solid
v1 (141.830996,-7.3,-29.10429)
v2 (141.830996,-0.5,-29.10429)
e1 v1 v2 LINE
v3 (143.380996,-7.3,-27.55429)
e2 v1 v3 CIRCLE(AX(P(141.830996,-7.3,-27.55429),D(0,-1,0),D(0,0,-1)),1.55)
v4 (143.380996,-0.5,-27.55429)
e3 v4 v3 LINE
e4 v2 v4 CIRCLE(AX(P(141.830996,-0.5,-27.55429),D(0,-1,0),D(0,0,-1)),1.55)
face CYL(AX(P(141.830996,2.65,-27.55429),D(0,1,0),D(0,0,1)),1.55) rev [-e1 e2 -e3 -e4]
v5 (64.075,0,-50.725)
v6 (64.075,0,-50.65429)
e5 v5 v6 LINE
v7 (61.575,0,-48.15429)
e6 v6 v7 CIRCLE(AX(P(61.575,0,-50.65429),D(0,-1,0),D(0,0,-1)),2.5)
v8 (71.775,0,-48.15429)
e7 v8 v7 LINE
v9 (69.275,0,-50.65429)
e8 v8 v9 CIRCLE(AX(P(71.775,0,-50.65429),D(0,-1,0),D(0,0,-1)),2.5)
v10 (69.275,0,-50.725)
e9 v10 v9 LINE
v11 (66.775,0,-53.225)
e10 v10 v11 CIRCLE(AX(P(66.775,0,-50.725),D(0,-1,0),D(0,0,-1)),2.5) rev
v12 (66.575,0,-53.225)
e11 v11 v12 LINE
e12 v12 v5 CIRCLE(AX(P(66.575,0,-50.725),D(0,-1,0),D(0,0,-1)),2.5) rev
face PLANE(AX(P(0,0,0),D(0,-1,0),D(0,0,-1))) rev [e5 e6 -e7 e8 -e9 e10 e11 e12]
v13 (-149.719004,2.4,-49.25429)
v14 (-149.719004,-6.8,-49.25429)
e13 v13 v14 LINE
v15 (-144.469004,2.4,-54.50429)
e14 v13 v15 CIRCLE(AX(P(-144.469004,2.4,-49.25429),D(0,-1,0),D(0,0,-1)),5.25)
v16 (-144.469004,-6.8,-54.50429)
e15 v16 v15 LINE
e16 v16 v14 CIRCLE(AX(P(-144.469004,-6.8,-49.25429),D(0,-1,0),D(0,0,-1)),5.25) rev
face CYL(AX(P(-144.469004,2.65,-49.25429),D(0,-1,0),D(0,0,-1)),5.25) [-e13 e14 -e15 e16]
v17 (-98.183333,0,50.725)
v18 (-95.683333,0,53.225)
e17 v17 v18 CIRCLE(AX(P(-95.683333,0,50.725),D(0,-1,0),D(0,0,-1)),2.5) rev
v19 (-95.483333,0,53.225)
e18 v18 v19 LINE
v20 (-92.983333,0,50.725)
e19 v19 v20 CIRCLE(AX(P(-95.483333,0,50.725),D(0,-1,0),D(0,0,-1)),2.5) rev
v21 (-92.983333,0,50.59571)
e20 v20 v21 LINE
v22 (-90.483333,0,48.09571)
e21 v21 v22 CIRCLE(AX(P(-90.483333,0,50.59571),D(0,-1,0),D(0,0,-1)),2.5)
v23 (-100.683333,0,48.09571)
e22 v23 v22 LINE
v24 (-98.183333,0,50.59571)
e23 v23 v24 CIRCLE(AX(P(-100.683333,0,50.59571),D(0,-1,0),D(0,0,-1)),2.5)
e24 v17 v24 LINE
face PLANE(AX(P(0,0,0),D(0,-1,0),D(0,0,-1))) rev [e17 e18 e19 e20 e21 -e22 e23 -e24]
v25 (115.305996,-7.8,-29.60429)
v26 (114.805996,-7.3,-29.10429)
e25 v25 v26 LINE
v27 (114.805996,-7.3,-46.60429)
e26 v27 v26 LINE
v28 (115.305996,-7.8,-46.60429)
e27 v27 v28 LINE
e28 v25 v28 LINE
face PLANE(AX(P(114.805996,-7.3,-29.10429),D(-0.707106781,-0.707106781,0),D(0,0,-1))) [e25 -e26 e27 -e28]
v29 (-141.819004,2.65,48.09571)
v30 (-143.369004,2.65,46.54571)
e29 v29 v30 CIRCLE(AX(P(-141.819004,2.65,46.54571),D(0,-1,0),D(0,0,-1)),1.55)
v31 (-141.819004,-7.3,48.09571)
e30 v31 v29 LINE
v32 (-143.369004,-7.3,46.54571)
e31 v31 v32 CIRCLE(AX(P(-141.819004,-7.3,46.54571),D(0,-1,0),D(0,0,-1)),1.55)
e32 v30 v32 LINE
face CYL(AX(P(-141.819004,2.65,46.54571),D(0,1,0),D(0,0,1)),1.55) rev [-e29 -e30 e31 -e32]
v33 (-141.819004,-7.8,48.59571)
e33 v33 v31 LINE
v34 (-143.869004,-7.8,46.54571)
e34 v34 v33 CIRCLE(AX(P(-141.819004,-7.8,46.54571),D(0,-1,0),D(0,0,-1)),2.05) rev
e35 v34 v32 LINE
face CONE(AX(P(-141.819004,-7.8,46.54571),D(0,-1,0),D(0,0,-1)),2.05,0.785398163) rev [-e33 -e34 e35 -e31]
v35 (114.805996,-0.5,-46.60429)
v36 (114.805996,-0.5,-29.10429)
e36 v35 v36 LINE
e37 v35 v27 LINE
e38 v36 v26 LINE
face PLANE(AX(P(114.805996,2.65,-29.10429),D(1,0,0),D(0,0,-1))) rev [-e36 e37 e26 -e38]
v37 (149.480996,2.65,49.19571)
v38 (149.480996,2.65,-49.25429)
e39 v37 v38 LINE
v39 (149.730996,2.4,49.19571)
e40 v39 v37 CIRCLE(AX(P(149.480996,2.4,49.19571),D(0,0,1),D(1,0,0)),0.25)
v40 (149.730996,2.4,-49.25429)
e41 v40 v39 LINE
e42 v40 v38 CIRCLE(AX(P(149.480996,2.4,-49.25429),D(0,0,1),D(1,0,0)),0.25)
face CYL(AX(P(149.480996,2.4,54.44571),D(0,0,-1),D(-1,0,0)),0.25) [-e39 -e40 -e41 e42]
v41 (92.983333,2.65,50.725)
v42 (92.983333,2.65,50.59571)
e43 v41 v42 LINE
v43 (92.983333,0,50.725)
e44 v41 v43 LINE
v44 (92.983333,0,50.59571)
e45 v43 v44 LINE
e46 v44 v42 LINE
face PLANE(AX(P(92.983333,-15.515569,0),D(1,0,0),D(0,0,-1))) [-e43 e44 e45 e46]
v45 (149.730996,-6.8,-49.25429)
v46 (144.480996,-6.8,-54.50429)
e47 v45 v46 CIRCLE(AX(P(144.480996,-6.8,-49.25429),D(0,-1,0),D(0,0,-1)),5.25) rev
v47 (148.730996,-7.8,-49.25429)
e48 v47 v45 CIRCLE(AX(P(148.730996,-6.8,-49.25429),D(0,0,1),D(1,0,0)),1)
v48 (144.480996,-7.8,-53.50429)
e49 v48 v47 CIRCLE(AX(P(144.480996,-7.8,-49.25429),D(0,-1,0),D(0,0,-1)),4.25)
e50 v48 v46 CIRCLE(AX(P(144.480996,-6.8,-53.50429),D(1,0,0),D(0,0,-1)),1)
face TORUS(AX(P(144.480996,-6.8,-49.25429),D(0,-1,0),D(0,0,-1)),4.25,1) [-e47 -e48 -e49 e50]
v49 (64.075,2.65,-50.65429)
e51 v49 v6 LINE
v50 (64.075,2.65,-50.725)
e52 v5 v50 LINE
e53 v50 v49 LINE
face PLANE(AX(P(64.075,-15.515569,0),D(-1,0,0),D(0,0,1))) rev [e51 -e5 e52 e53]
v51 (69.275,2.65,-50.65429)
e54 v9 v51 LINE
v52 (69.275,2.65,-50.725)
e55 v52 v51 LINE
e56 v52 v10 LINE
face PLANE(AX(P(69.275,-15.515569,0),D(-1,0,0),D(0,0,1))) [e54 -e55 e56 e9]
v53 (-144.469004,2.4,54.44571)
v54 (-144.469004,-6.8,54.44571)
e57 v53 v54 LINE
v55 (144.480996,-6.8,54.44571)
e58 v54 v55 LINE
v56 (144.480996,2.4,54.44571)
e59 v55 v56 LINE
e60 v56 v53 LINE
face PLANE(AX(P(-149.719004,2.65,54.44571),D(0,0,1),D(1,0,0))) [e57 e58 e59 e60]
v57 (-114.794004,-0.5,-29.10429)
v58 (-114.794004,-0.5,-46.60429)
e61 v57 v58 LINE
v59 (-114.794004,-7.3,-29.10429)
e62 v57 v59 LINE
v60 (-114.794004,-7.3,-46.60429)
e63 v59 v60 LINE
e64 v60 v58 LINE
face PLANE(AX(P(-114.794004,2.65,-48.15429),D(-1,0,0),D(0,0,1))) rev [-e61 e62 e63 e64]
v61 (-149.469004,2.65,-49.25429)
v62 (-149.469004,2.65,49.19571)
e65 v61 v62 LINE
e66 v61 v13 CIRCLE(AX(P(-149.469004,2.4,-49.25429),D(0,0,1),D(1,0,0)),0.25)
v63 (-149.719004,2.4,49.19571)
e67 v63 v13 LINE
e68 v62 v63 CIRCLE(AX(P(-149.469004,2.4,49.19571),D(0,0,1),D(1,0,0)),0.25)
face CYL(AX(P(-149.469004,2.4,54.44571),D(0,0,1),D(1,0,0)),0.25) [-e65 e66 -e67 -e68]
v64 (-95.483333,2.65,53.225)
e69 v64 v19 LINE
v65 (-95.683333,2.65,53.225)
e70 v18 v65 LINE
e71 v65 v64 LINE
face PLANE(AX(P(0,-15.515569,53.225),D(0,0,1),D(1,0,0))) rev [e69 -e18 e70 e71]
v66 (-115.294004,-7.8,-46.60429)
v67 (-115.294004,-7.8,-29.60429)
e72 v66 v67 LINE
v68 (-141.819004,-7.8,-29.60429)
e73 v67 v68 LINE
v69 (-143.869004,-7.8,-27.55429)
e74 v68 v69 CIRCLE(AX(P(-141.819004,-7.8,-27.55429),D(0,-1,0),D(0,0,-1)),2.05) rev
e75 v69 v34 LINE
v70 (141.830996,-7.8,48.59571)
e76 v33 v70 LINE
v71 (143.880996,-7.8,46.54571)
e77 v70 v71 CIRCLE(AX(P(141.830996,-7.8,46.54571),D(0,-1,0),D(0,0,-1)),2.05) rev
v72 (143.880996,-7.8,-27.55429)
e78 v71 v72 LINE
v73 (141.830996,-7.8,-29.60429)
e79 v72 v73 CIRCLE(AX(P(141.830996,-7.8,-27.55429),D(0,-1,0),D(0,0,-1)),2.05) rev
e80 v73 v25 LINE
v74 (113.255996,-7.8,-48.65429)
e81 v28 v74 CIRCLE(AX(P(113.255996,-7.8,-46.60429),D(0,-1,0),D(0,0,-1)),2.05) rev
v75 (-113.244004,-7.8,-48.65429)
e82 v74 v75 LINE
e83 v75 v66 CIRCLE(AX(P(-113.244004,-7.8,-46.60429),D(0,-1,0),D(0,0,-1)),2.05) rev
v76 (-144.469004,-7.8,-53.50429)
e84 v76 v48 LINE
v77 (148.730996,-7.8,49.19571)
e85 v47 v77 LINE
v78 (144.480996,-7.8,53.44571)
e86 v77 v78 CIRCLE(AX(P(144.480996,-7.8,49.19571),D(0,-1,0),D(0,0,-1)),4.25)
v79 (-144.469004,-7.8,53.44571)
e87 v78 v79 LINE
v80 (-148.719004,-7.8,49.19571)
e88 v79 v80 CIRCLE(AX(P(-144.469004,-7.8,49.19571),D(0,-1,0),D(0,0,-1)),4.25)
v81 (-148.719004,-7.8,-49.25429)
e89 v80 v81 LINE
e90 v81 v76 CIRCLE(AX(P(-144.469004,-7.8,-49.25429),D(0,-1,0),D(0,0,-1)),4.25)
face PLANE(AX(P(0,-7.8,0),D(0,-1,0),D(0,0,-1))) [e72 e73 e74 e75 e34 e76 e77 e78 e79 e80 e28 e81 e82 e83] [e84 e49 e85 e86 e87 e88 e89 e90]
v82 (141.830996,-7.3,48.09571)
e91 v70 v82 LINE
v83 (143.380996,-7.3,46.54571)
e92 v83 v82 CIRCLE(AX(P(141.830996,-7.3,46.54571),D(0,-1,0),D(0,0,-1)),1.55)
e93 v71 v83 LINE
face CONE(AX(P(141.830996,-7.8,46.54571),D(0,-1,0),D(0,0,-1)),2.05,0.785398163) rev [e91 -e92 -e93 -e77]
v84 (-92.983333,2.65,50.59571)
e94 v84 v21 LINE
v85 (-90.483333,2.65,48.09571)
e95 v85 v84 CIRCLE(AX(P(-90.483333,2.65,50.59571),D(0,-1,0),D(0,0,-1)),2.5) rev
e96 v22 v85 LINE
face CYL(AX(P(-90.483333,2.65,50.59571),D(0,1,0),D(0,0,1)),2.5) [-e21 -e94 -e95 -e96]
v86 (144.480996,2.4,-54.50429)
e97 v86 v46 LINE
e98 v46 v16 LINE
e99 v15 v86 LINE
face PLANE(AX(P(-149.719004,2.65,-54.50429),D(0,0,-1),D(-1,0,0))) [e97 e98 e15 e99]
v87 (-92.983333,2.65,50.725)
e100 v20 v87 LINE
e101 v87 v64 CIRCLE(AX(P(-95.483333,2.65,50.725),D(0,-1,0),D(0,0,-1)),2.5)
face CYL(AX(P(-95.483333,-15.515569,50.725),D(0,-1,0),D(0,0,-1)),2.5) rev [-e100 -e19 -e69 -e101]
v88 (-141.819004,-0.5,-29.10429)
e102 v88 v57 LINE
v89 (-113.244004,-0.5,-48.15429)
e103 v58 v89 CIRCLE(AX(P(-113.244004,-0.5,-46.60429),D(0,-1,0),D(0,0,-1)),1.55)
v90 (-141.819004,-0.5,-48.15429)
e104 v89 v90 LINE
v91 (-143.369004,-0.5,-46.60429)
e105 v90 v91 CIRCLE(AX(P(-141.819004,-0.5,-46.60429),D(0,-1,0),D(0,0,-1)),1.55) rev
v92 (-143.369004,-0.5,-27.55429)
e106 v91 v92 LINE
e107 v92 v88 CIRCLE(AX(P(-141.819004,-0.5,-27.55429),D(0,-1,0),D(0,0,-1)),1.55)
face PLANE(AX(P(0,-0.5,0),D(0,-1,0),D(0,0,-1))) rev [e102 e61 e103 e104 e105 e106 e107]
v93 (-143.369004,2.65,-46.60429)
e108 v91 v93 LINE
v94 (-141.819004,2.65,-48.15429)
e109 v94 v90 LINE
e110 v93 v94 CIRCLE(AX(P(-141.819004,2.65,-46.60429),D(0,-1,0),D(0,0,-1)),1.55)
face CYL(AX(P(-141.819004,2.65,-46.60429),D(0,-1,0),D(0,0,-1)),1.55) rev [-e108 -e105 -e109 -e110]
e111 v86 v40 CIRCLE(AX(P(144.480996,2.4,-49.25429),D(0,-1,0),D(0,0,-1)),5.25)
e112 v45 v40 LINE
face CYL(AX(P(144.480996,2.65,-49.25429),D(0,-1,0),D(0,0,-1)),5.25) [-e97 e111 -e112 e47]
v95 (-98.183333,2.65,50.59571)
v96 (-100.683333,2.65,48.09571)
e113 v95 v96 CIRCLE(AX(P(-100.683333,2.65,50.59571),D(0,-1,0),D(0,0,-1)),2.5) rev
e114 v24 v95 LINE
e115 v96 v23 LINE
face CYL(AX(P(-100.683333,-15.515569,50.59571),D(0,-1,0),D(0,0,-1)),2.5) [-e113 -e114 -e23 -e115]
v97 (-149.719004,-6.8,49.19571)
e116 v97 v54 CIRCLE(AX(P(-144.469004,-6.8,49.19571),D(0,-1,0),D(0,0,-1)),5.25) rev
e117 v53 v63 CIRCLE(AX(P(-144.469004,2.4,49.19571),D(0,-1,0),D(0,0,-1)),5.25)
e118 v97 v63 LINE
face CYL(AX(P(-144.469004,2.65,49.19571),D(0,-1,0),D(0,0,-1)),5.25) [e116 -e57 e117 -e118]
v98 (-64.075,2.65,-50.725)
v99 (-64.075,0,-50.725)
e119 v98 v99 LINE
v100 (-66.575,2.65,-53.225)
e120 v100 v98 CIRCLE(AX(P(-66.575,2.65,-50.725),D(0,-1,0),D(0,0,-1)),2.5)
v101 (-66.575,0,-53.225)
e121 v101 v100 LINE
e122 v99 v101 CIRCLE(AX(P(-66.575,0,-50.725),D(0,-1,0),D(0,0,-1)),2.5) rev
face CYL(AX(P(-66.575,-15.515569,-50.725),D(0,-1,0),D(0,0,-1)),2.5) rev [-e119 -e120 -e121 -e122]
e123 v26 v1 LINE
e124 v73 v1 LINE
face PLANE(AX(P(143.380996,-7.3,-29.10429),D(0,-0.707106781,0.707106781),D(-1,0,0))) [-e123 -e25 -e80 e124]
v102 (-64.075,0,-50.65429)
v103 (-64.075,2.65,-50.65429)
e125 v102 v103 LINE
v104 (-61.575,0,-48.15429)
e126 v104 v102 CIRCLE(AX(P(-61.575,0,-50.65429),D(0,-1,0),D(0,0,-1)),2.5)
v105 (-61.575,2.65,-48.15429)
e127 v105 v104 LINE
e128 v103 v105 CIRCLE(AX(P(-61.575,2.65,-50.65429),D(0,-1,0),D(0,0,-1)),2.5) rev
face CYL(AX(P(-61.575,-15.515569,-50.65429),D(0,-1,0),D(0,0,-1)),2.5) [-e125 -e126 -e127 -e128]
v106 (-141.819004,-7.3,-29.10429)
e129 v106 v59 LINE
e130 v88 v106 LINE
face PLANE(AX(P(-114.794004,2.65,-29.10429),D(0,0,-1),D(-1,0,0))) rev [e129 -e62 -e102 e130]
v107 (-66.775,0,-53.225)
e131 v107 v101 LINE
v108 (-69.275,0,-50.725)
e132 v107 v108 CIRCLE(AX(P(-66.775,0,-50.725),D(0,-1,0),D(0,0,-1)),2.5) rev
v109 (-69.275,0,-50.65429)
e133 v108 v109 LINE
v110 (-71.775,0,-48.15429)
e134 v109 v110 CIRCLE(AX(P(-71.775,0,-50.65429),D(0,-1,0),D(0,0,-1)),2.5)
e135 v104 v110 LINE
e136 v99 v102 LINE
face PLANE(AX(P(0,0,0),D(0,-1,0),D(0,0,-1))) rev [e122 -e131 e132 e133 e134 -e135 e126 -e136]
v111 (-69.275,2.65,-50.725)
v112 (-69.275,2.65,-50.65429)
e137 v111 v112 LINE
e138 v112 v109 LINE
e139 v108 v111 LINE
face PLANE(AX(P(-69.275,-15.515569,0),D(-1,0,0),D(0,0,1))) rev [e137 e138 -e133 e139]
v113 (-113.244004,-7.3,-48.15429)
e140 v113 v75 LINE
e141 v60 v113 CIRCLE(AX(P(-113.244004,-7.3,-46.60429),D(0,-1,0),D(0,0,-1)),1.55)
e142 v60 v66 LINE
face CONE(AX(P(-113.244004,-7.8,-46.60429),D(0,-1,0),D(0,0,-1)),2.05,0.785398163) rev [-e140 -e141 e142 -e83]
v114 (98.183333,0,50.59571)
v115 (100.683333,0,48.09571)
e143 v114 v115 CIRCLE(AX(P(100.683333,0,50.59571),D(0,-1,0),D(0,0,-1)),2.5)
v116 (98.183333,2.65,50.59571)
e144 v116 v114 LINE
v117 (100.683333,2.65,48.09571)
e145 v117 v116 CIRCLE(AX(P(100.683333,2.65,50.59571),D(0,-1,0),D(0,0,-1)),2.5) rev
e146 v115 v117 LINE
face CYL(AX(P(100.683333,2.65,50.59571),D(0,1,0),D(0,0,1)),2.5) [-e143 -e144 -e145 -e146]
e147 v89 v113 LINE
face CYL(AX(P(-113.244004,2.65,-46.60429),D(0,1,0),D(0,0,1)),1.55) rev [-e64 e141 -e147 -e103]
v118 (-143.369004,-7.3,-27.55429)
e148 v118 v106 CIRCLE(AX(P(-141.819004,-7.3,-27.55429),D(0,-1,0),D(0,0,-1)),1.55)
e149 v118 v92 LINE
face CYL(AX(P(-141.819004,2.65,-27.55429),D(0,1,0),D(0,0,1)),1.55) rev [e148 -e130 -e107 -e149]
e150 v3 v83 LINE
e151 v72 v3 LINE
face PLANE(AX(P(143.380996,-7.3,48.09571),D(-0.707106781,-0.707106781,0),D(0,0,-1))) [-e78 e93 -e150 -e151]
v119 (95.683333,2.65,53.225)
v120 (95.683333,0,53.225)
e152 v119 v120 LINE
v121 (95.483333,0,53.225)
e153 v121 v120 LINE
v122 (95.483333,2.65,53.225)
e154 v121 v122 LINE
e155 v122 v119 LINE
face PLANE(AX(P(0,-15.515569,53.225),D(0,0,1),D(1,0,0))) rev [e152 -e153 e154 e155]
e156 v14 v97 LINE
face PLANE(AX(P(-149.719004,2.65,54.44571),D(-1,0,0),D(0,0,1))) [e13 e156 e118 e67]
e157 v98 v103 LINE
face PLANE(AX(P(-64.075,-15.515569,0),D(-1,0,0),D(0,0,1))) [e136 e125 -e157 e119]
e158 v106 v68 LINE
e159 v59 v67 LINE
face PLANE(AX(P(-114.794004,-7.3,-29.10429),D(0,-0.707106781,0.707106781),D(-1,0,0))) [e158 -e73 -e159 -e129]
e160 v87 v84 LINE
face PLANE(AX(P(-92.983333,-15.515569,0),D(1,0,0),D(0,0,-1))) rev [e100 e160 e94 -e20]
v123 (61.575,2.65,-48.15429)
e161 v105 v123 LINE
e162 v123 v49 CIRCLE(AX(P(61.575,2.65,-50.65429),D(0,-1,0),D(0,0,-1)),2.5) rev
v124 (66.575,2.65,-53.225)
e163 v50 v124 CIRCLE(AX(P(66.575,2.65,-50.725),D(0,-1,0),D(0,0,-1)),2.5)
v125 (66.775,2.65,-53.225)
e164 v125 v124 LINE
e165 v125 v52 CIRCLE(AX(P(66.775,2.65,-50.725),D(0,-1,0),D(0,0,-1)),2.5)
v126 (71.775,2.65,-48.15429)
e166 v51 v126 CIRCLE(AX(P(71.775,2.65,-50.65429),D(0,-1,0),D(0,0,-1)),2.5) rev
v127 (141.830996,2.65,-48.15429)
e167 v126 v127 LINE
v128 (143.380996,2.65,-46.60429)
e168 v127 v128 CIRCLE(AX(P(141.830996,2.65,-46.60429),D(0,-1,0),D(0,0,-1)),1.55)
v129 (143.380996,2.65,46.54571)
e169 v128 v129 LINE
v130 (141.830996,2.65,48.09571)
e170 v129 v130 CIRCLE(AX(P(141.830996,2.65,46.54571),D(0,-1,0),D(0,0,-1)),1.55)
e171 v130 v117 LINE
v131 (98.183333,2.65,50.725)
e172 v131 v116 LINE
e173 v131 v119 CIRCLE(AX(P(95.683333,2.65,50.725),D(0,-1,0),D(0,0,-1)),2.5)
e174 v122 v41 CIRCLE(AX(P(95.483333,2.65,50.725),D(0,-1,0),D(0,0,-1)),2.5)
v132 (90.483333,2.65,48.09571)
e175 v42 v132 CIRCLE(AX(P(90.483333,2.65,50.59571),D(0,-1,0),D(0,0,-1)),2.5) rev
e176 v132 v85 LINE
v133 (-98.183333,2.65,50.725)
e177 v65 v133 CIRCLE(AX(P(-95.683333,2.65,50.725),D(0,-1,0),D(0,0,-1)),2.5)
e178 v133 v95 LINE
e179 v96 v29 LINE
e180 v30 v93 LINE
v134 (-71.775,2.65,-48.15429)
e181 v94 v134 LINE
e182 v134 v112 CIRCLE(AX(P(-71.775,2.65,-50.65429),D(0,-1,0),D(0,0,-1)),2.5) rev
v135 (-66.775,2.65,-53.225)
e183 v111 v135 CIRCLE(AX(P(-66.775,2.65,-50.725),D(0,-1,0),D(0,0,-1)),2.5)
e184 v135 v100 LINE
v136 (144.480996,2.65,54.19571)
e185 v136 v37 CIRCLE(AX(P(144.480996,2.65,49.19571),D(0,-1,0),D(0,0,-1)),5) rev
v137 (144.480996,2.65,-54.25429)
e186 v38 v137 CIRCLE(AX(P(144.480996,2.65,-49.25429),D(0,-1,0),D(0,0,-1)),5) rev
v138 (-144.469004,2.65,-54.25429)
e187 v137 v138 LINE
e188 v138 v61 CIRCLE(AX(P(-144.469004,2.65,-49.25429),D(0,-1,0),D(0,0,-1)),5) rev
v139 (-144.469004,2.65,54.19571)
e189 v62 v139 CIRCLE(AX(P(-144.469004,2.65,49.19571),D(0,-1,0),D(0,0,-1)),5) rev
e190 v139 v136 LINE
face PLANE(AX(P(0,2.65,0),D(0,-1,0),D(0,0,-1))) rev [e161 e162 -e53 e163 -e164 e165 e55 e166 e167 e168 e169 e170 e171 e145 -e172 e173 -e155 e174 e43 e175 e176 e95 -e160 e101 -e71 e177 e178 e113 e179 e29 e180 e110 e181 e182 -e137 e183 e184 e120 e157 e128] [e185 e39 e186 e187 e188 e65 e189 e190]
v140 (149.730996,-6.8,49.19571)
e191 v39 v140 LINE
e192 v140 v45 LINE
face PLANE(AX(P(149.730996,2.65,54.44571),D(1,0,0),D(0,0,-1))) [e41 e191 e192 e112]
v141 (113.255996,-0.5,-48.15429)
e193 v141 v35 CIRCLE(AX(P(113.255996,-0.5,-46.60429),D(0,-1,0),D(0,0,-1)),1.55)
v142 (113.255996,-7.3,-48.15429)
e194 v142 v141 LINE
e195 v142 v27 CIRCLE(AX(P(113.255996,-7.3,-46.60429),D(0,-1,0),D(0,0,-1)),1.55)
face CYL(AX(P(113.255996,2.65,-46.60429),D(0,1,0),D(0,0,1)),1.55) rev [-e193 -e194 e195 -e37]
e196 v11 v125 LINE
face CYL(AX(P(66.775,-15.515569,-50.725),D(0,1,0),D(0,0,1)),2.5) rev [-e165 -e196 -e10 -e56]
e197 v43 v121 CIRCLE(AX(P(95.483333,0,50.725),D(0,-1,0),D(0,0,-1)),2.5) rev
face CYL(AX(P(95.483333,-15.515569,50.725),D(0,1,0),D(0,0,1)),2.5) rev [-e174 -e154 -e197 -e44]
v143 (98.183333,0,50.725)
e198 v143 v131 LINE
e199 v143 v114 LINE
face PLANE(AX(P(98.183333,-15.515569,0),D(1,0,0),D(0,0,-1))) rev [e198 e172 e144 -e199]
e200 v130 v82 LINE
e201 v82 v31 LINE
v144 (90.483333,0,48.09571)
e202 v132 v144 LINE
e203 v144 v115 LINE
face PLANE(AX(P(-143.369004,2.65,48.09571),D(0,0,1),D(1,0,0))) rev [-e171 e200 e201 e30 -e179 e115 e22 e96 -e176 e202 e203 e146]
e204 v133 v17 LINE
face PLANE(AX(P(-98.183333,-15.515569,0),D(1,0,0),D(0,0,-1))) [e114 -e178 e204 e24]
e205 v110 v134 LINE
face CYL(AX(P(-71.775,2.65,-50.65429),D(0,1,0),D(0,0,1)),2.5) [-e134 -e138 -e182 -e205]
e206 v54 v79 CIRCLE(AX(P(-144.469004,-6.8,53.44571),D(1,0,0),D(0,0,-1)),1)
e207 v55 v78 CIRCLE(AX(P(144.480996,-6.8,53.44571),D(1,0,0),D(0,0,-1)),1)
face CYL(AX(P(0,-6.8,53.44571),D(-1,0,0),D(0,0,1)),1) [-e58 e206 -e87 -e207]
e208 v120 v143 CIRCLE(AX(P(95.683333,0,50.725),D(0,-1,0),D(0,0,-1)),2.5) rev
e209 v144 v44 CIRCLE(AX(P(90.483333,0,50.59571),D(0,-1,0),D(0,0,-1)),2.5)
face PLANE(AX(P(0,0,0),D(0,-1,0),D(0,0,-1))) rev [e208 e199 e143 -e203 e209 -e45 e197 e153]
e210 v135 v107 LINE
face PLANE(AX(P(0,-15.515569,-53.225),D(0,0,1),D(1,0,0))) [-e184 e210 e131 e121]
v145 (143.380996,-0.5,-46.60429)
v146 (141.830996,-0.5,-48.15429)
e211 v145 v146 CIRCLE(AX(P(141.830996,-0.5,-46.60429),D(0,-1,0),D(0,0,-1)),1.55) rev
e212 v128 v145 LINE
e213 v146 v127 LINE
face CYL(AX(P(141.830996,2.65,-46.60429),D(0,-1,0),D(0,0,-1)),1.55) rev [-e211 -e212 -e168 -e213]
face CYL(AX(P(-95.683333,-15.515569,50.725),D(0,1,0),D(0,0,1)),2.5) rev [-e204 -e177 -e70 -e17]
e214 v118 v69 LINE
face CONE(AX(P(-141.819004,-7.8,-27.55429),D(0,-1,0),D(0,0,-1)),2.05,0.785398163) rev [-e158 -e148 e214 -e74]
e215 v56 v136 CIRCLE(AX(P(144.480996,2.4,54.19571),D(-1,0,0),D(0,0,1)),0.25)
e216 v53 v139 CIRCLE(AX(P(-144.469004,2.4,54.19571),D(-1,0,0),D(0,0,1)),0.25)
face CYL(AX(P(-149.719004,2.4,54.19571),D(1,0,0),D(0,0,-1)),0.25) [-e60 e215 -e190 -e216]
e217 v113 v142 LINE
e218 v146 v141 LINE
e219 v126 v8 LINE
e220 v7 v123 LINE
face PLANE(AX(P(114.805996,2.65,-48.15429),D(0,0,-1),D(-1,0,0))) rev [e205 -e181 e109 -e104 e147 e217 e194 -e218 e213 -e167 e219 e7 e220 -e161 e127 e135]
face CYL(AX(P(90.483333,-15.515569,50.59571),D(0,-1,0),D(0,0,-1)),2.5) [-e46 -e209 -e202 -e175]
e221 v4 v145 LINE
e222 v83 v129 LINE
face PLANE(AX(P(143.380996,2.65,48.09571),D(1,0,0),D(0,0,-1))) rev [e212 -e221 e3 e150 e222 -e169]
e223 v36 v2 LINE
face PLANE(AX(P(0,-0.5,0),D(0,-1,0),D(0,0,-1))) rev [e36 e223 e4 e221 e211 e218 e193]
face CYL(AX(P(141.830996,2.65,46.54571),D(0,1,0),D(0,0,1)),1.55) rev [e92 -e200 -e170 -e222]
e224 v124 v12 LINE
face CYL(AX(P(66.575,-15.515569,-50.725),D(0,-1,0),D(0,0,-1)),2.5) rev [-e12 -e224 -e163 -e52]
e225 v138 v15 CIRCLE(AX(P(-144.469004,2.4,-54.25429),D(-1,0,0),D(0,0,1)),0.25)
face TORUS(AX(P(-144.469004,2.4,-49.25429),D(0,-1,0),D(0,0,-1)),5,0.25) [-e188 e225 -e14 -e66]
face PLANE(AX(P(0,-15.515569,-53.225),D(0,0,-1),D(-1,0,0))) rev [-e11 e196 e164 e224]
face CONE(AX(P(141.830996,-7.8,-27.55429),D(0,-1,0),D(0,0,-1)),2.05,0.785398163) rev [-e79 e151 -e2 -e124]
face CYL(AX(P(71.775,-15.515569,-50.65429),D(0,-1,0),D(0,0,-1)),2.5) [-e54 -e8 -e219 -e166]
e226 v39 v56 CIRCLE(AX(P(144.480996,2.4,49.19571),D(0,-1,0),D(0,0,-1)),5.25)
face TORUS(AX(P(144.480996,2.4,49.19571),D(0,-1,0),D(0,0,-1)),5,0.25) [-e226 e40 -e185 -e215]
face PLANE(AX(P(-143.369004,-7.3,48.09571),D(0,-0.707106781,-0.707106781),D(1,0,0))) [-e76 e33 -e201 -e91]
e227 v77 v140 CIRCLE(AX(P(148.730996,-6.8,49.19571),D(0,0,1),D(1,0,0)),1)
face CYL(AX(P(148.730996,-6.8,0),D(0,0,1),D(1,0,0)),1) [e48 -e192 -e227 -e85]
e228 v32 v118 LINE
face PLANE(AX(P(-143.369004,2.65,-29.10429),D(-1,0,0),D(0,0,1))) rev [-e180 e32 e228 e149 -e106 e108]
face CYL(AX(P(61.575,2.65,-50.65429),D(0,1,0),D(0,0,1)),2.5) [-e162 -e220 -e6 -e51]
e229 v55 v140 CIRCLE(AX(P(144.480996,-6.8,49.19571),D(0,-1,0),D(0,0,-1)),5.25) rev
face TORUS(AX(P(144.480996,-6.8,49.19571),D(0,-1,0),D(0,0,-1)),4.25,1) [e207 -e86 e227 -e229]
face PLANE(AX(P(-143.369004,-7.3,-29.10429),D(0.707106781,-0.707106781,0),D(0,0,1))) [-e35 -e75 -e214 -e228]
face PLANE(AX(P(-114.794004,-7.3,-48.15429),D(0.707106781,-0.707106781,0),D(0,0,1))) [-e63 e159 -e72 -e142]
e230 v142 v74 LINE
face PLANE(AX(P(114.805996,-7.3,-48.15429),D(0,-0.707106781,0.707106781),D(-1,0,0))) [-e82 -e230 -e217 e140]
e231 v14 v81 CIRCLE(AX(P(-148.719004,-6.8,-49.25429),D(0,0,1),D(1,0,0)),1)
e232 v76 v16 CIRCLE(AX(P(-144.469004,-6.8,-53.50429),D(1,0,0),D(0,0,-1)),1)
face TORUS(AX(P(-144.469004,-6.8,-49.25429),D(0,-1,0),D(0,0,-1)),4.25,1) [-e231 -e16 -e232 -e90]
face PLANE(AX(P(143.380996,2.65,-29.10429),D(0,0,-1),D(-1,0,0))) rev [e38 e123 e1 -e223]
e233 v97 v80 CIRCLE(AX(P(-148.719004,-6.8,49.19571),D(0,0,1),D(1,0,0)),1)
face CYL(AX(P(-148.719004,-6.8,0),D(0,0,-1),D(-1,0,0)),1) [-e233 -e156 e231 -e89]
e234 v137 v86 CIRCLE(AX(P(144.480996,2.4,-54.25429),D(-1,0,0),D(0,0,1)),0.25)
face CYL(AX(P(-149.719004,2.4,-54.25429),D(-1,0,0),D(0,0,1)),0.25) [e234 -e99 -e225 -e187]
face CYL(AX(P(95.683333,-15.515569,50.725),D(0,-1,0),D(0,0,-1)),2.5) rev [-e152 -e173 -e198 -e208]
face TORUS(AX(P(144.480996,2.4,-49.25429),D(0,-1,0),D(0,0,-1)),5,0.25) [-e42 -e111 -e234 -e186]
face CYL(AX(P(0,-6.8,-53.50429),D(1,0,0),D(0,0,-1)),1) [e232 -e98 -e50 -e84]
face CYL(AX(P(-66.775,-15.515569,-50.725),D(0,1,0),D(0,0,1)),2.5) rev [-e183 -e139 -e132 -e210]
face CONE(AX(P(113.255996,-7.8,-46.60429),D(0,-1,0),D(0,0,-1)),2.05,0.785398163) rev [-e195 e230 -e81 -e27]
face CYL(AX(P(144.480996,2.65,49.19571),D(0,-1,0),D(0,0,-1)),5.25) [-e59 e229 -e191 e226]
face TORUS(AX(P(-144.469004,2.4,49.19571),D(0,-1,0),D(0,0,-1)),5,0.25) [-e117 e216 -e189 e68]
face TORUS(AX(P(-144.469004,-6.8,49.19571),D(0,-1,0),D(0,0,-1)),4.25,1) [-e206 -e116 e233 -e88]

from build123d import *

# Parameters (mm, degrees)
BOSS_EXTRUDE1_DEPTH      = 7.8
BOSS_EXTRUDE1_DEPTH_BACK = 2.65
SKETCH1_W                = 299.45
SKETCH1_H                = 108.950000082
CUT_EXTRUDE1_START       = 2.65
SKETCH3_W                = 28.574999543
SKETCH3_H                = 19.050000082
SKETCH3_W_2              = 28.575000457
CUT_EXTRUDE1_DEPTH       = 3.15
CUT_EXTRUDE2_START       = -98.183332877
CUT_EXTRUDE2_OUTLINE_W   = 2.65
CUT_EXTRUDE2_OUTLINE_H   = 5.129290046
CUT_EXTRUDE2_DEPTH       = 5.2
CUT_EXTRUDE2_START_2     = 92.983332877
CUT_EXTRUDE2_2_OUTLINE_W = 2.65
CUT_EXTRUDE2_2_OUTLINE_H = 5.129290046
CUT_EXTRUDE2_2_DEPTH     = 5.2
CUT_EXTRUDE2_START_3     = -69.275
CUT_EXTRUDE2_3_OUTLINE_W = 2.65
CUT_EXTRUDE2_3_OUTLINE_H = 5.070709954
CUT_EXTRUDE2_3_DEPTH     = 5.2
CUT_EXTRUDE2_START_4     = 64.075
CUT_EXTRUDE2_4_OUTLINE_W = 2.65
CUT_EXTRUDE2_4_OUTLINE_H = 5.070709954
CUT_EXTRUDE2_4_DEPTH     = 5.2
FILLET1_R                = 5.25
FILLET2_R                = 1.55
FILLET3_R                = 0.25
CHAMFER1_SIZE            = 0.5
FILLET4_R                = 1
FILLET7_R                = 2.5


# Read off the part's stored shape, not the designer's step: Cut-Extrude2
with BuildPart() as part:
    # Sketch1 → Boss-Extrude1 (new, two sides: drawn at the far end of the back side and taken through both)
    with BuildSketch(Plane.XZ.offset(-BOSS_EXTRUDE1_DEPTH_BACK)):
        with Locations((0.005996207, -0.029290046)):
            Rectangle(SKETCH1_W, SKETCH1_H)
        Polygon((-143.369003793, 48.095709995), (143.380996207, 48.095709995), (143.380996207, -29.104290005), (114.80599575, -29.104290005), (114.80599575, -48.154290087), (-114.79400425, -48.154290087), (-114.79400425, -29.104290005), (-143.369003793, -29.104290005), align=None, mode=Mode.SUBTRACT)
    extrude(amount=BOSS_EXTRUDE1_DEPTH + BOSS_EXTRUDE1_DEPTH_BACK)

    # Sketch3 → Cut-Extrude1 (cut)
    with BuildSketch(Plane(origin=(0, 0, 0), x_dir=(1, 0, 0), z_dir=(0, 1, 0)).offset(CUT_EXTRUDE1_START)):
        with Locations((-129.081504021, 38.629290046)):
            Rectangle(SKETCH3_W, SKETCH3_H)
        with Locations((129.093495979, 38.629290046)):
            Rectangle(SKETCH3_W_2, SKETCH3_H)
    extrude(amount=-CUT_EXTRUDE1_DEPTH, mode=Mode.SUBTRACT)

    # Cut-Extrude2 outline → Cut-Extrude2 (cut)
    with BuildSketch(Plane.YZ.offset(CUT_EXTRUDE2_START)):
        with Locations((1.325, 50.660355018)):
            Rectangle(CUT_EXTRUDE2_OUTLINE_W, CUT_EXTRUDE2_OUTLINE_H)
    extrude(amount=CUT_EXTRUDE2_DEPTH, mode=Mode.SUBTRACT)

    # Cut-Extrude2 2 outline → Cut-Extrude2 2 (cut)
    with BuildSketch(Plane.YZ.offset(CUT_EXTRUDE2_START_2)):
        with Locations((1.325, 50.660355018)):
            Rectangle(CUT_EXTRUDE2_2_OUTLINE_W, CUT_EXTRUDE2_2_OUTLINE_H)
    extrude(amount=CUT_EXTRUDE2_2_DEPTH, mode=Mode.SUBTRACT)

    # Cut-Extrude2 3 outline → Cut-Extrude2 3 (cut)
    with BuildSketch(Plane.YZ.offset(CUT_EXTRUDE2_START_3)):
        with Locations((1.325, -50.689645064)):
            Rectangle(CUT_EXTRUDE2_3_OUTLINE_W, CUT_EXTRUDE2_3_OUTLINE_H)
    extrude(amount=CUT_EXTRUDE2_3_DEPTH, mode=Mode.SUBTRACT)

    # Cut-Extrude2 4 outline → Cut-Extrude2 4 (cut)
    with BuildSketch(Plane.YZ.offset(CUT_EXTRUDE2_START_4)):
        with Locations((1.325, -50.689645064)):
            Rectangle(CUT_EXTRUDE2_4_OUTLINE_W, CUT_EXTRUDE2_4_OUTLINE_H)
    extrude(amount=CUT_EXTRUDE2_4_DEPTH, mode=Mode.SUBTRACT)

    # Fillet1
    fillet1_edges = [part.edges().sort_by_distance(p)[0] for p in [
        (-149.719003793, -2.575, 54.445709995),
        (149.730996207, -2.575, 54.445709995),
        (149.730996207, -2.575, -54.504290087),
        (-149.719003793, -2.575, -54.504290087),
    ]]
    fillet(fillet1_edges, radius=FILLET1_R)

    # Fillet2
    fillet2_edges = [part.edges().sort_by_distance(p)[0] for p in [
        (-143.369003793, -2.575, 48.095709995),
        (143.380996207, -2.575, 48.095709995),
        (-143.369003793, -4.15, -29.104290005),
        (-114.79400425, -4.15, -48.154290087),
        (114.80599575, -4.15, -48.154290087),
        (143.380996207, -4.15, -29.104290005),
        (-143.369003793, 1.075, -48.154290087),
        (143.380996207, 1.075, -48.154290087),
    ]]
    fillet(fillet2_edges, radius=FILLET2_R)

    # Fillet3
    fillet3_edges = [part.edges().sort_by_distance(p)[0] for p in [
        (-149.719003793, 2.65, -0.029290046),
        (0.005996207, 2.65, -54.504290087),
        (0.005996207, 2.65, 54.445709995),
        (149.730996207, 2.65, -0.029290046),
        (-148.181314394, 2.65, 52.908020596),
        (148.193306808, 2.65, 52.908020596),
        (148.193306808, 2.65, -52.966600688),
        (-148.181314394, 2.65, -52.966600688),
    ]]
    fillet(fillet3_edges, radius=FILLET3_R)

    # Chamfer1
    chamfer1_edges = [part.edges().sort_by_distance(p)[0] for p in [
        (0.00599575, -7.8, -48.154290087),
        (143.380996207, -7.8, 9.495709995),
        (-143.369003793, -7.8, 9.495709995),
        (114.80599575, -7.8, -37.854290046),
        (0.005996207, -7.8, 48.095709995),
        (-128.306504021, -7.8, -29.104290005),
        (114.352011261, -7.8, -47.700305598),
        (142.927011718, -7.8, -28.650305516),
        (142.927011718, -7.8, 47.641725506),
        (-114.34001976, -7.8, -47.700305598),
        (-142.915019304, -7.8, -28.650305516),
        (-142.915019304, -7.8, 47.641725506),
        (-114.79400425, -7.8, -37.854290046),
        (128.318495979, -7.8, -29.104290005),
    ]]
    chamfer(chamfer1_edges, length=CHAMFER1_SIZE)

    # Fillet4
    fillet4_edges = [part.edges().sort_by_distance(p)[0] for p in [
        (-149.719003793, -7.8, -0.029290046),
        (0.005996207, -7.8, -54.504290087),
        (149.730996207, -7.8, -0.029290046),
        (0.005996207, -7.8, 54.445709995),
        (-148.181314394, -7.8, 52.908020596),
        (148.193306808, -7.8, 52.908020596),
        (148.193306808, -7.8, -52.966600688),
        (-148.181314394, -7.8, -52.966600688),
    ]]
    fillet(fillet4_edges, radius=FILLET4_R)

    # Fillet7
    fillet7_edges = [part.edges().sort_by_distance(p)[0] for p in [
        (-98.183332877, 1.325, 53.225000041),
        (-92.983332877, 1.325, 53.225000041),
        (92.983332877, 1.325, 53.225000041),
        (98.183332877, 1.325, 53.225000041),
        (69.275, 1.325, -53.225000041),
        (64.075, 1.325, -53.225000041),
        (-64.075, 1.325, -53.225000041),
        (-69.275, 1.325, -53.225000041),
        (-69.275, 1.325, -48.154290087),
        (-64.075, 1.325, -48.154290087),
        (69.275, 1.325, -48.154290087),
        (64.075, 1.325, -48.154290087),
        (92.983332877, 1.325, 48.095709995),
        (98.183332877, 1.325, 48.095709995),
        (-98.183332877, 1.325, 48.095709995),
        (-92.983332877, 1.325, 48.095709995),
    ]]
    fillet(fillet7_edges, radius=FILLET7_R)


solid = part.part
